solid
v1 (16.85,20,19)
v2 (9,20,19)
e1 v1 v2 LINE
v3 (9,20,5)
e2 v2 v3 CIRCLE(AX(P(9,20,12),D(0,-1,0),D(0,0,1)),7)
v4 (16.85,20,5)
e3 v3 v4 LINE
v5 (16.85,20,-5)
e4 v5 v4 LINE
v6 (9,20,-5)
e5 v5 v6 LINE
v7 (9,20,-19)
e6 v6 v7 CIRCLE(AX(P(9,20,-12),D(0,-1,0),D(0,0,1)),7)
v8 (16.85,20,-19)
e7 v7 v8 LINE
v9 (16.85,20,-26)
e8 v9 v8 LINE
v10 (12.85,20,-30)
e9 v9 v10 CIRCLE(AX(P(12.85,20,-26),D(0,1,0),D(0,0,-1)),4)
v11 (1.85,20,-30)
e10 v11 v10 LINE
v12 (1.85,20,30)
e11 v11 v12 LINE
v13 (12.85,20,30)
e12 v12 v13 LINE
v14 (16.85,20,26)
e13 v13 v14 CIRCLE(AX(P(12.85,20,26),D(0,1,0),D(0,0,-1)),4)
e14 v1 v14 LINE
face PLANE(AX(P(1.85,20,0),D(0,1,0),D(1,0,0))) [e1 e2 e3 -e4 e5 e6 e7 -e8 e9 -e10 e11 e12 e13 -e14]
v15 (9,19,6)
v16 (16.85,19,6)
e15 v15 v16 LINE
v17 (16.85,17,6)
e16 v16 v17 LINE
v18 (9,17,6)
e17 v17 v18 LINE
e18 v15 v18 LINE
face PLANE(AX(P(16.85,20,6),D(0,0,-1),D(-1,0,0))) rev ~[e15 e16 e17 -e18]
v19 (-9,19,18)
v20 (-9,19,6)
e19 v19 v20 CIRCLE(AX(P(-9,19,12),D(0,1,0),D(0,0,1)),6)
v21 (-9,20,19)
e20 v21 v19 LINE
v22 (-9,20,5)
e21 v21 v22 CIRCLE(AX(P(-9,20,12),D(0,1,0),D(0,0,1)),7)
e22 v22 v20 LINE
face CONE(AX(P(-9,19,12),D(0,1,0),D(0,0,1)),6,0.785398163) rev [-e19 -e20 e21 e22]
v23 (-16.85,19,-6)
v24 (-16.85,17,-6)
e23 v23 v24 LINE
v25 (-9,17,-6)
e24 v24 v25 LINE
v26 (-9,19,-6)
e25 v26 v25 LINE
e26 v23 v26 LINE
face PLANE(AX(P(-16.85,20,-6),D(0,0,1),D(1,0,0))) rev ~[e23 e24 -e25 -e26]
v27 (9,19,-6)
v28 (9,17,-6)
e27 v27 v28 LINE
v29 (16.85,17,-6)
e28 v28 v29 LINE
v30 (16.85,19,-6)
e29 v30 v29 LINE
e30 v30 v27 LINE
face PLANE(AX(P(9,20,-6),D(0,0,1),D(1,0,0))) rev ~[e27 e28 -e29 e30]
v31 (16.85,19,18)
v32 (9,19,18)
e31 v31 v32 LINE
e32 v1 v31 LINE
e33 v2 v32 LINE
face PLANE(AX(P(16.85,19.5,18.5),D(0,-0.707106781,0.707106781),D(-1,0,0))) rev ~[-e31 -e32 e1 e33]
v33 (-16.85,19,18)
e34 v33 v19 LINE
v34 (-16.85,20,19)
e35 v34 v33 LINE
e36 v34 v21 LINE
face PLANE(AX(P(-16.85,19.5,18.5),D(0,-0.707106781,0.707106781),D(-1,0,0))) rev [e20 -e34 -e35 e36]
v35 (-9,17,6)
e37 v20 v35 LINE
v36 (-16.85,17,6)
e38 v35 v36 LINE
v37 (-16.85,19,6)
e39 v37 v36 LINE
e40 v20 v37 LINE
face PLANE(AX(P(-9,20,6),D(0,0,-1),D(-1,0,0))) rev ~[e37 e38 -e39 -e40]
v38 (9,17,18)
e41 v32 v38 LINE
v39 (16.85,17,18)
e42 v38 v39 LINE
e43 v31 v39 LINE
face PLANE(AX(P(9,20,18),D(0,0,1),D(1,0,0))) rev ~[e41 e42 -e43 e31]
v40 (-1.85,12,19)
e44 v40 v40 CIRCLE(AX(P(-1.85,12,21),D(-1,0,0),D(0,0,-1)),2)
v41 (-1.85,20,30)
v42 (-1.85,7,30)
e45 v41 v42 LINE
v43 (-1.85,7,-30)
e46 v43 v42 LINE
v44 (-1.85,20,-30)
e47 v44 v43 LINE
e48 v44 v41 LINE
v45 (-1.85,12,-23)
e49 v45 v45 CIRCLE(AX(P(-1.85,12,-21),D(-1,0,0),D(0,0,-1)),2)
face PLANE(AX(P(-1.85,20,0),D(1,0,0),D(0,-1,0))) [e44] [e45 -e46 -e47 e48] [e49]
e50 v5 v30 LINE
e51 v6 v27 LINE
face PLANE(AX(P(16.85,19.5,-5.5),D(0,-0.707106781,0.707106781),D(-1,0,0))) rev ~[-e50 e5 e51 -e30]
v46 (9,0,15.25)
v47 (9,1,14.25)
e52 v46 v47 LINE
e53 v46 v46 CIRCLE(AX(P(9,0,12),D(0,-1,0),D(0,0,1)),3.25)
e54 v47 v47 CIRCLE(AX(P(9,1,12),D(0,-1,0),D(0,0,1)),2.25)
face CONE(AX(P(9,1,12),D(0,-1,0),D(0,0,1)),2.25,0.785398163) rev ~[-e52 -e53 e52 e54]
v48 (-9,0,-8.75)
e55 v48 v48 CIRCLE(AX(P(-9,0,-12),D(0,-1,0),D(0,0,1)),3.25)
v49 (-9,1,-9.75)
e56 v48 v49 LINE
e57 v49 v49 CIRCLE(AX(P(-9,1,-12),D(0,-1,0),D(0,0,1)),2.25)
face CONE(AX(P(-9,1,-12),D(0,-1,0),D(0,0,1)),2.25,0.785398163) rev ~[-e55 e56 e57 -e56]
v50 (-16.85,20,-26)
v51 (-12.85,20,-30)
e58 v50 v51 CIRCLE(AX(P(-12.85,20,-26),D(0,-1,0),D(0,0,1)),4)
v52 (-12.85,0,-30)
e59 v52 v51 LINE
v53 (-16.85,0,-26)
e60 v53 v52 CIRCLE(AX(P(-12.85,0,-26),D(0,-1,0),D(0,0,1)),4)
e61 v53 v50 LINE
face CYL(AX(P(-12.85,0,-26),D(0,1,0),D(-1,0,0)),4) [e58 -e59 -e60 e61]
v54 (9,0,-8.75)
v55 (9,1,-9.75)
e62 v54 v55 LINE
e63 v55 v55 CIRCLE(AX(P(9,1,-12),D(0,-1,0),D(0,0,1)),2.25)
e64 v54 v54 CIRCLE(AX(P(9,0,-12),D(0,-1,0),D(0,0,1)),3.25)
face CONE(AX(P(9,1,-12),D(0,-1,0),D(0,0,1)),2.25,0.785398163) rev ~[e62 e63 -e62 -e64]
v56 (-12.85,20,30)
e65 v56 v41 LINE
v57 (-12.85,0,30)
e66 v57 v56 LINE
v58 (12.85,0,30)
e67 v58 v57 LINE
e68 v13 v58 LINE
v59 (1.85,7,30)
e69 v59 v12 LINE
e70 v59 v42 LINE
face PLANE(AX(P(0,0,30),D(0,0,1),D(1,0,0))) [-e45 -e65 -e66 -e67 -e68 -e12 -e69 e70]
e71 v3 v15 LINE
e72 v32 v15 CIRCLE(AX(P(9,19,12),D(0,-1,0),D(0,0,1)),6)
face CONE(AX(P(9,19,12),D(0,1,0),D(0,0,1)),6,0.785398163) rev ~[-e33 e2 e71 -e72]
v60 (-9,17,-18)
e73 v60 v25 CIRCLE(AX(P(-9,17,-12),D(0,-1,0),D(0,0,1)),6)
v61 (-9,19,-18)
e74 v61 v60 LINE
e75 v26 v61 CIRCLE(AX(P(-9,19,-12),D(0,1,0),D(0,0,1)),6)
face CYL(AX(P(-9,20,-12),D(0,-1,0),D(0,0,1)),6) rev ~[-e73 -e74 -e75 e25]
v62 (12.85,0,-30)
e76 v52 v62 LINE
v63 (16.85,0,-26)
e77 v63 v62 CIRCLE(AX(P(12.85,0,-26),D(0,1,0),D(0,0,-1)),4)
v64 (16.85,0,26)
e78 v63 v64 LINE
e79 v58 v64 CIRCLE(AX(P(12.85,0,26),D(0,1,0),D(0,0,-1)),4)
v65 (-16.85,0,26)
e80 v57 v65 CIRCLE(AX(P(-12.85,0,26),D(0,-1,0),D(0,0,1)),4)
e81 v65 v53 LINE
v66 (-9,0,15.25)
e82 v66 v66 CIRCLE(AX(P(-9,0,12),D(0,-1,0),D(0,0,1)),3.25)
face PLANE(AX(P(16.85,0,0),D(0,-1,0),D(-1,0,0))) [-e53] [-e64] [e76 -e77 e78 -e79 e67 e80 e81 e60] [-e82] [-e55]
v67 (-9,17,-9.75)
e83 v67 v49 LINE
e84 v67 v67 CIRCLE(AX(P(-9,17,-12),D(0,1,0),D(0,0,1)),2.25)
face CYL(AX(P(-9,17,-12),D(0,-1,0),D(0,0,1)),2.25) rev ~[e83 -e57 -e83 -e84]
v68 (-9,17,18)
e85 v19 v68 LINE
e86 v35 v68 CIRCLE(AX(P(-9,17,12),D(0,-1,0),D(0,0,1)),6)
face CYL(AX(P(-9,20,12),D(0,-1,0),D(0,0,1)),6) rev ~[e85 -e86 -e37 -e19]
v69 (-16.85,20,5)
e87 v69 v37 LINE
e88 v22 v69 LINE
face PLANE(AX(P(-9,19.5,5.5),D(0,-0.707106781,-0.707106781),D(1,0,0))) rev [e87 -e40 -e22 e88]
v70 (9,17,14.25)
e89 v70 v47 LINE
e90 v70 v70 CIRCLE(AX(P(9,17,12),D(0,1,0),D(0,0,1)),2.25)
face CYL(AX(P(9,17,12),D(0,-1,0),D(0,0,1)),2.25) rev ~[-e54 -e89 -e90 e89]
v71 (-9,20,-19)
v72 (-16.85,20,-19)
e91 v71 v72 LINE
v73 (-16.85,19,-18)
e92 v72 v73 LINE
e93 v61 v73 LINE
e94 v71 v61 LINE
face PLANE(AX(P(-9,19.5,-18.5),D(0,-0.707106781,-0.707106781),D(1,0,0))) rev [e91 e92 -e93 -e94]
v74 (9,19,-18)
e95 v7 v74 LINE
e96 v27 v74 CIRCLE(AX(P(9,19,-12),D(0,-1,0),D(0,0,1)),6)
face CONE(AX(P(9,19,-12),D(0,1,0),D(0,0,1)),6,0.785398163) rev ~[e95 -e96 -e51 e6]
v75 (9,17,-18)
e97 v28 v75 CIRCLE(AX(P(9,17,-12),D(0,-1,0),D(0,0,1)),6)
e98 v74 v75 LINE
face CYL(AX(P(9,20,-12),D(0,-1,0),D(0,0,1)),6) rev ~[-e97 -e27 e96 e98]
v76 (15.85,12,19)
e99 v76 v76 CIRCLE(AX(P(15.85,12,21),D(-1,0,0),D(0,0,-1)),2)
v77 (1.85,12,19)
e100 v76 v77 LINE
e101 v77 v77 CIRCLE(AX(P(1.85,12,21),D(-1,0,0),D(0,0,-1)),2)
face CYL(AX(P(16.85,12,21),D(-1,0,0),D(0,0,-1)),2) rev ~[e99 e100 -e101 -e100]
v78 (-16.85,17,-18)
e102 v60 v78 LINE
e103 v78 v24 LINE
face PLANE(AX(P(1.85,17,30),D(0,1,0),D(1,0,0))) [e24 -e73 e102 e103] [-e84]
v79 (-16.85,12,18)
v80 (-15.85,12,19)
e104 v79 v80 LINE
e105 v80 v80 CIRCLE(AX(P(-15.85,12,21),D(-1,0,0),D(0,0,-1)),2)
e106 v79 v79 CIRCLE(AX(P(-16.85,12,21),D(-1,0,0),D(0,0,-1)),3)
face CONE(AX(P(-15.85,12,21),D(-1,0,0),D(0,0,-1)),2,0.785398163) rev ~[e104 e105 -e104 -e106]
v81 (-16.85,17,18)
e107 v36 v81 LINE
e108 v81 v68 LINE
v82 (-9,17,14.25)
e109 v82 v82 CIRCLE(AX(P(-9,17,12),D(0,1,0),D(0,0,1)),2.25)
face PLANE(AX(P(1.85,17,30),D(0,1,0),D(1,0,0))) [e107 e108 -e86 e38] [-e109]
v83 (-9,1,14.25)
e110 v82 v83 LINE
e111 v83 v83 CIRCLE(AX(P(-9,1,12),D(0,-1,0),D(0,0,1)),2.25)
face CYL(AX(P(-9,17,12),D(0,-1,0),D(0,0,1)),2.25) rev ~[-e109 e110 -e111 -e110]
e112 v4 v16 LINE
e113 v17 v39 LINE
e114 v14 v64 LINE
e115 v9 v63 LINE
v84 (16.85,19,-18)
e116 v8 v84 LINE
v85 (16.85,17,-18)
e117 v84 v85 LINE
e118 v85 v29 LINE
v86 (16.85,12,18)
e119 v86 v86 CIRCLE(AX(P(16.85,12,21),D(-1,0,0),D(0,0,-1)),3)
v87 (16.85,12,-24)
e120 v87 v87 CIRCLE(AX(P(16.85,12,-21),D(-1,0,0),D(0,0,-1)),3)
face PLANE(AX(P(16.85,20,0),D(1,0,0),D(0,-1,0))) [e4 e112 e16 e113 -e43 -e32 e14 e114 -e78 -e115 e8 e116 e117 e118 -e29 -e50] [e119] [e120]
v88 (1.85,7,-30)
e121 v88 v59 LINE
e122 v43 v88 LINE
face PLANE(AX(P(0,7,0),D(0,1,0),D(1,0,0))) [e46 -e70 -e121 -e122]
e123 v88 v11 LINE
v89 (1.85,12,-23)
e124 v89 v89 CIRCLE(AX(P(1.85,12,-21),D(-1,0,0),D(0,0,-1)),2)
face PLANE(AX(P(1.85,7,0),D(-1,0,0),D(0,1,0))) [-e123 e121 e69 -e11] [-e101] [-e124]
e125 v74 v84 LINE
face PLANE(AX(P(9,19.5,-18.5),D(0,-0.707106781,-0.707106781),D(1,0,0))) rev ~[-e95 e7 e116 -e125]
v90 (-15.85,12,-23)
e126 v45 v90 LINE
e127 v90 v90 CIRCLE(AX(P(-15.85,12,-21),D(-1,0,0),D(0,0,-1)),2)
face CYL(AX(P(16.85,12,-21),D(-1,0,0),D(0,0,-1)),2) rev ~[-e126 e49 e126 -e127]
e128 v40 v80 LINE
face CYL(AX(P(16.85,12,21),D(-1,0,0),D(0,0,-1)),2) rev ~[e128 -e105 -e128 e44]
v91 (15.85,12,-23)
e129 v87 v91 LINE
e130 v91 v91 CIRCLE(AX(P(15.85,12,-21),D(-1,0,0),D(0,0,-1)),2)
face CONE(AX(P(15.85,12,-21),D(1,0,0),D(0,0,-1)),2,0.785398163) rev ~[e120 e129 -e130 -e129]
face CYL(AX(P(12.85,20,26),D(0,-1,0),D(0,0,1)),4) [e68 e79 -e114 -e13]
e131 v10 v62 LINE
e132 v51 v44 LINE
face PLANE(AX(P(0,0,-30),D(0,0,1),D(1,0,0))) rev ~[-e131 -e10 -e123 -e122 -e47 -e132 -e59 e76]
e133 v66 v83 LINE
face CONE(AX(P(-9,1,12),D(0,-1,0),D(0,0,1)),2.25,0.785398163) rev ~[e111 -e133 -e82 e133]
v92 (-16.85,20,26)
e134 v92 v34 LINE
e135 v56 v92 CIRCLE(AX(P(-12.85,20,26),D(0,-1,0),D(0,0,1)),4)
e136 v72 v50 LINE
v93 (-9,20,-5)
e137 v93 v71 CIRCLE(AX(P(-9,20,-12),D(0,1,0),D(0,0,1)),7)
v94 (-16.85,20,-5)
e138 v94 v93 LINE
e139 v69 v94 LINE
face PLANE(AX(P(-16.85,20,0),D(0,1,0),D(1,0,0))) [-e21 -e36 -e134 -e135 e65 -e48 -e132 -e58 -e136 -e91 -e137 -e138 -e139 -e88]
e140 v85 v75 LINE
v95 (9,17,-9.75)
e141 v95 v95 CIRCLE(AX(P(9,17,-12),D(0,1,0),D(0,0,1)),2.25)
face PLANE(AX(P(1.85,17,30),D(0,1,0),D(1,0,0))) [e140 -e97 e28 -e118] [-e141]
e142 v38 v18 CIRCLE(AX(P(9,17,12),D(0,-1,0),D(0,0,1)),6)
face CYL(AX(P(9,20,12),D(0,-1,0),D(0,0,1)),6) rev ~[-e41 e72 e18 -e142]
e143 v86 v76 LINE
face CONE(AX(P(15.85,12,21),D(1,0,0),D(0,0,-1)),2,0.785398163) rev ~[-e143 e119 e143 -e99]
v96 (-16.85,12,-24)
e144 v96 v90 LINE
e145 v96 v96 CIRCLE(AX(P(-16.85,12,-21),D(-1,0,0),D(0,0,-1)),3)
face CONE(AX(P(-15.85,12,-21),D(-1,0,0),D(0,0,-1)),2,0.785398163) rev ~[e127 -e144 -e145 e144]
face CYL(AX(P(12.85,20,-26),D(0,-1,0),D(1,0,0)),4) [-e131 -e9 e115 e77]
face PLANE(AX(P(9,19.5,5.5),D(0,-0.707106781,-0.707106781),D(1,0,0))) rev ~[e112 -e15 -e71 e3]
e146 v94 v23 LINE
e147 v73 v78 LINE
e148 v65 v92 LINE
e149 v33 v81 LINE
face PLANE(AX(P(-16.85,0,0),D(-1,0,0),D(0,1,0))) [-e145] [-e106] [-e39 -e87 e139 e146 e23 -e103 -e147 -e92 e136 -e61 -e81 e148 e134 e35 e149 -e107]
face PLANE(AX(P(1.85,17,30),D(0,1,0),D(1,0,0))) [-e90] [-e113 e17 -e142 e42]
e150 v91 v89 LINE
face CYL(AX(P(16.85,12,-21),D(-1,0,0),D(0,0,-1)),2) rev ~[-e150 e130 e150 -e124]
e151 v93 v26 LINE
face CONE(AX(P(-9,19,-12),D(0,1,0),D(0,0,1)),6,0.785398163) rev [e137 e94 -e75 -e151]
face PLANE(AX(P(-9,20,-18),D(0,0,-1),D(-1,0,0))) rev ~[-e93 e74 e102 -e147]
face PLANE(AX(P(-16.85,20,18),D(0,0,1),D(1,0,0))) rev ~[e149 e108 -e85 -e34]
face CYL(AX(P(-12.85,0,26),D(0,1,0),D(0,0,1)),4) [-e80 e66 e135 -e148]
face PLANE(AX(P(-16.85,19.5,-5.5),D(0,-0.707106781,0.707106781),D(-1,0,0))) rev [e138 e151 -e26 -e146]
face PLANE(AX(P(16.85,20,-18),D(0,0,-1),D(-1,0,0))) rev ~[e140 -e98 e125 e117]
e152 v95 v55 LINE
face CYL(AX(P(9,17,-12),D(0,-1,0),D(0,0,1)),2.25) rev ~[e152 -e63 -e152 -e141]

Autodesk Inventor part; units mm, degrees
ref_plane "YZ Plane" through (0, 0, 0) normal (1, 0, 0) x (0, 1, 0)
ref_plane "XZ Plane" through (0, 0, 0) normal (0, 1, 0) x (-1, 0, 0)
ref_plane "XY Plane" through (0, 0, 0) normal (0, 0, 1) x (1, 0, 0)
sketch "Sketch1" plane through (0, 0, 0) normal (0, 0, 1) x (1, 0, 0)
  line L0 (16.85, 0) -> (-16.85, 0)
  line L1 (-16.85, 0) -> (-16.85, 20)
  line L2 (-16.85, 20) -> (-1.85, 20)
  line L3 (-1.85, 20) -> (-1.85, 7)
  line L4 (-1.85, 7) -> (1.85, 7)
  line L5 (1.85, 7) -> (1.85, 20)
  line L6 (1.85, 20) -> (16.85, 20)
  line L7 (16.85, 20) -> (16.85, 0)
  line L8 (-23.59, 0) -> (23.59, 0) projected
  line L9 (0, -4) -> (0, 24) projected
  point P0 (0, 0)
  point P1 (0, 7)
  point P2 (0, 0)
  dimension "d0" = 33.7
  dimension "d1" = 3.7
  dimension "d2" = 13
  dimension "d3" = 20
extrude "Extrusion1" add sketch "Sketch1" along normal mid plane 60
sketch "Sketch2" plane through (-16.85, 20, 30) normal (0, 1, 0) x (1, 0, 0)
  line L0 (0, 60) -> (0, 0) projected
  line L1 (15, 0) -> (0, 0) projected
  line L2 (15, 60) -> (15, 0) projected
  line L3 (0, 60) -> (15, 60) projected
  line L4 (18.7, 60) -> (18.7, 0) projected
  line L5 (33.7, 0) -> (18.7, 0) projected
  line L6 (33.7, 60) -> (33.7, 0) projected
  line L7 (18.7, 60) -> (33.7, 60) projected
  line L8 (25.85, 42) -> (7.85, 42) construction
  line L9 (7.85, 42) -> (7.85, 18) construction
  line L10 (7.85, 18) -> (25.85, 18) construction
  line L11 (25.85, 18) -> (25.85, 42) construction
  line L12 (25.85, 42) -> (7.85, 18) construction
  line L13 (7.85, 42) -> (25.85, 18) construction
  point P0 (16.85, 30)
  dimension "d6" = 18
  dimension "d7" = 24
hole "Hole1" at (-9, 20, 12) at (-9, 20, -12) at (9, 20, 12) at (9, 20, -12) direction (0, -1, 0) diameter 4.5 end through all counterbore diameter 12 counterbore depth 3
sketch "Sketch3" plane through (1.85, 20, 30) normal (0, 1, 0) x (1, 0, 0)
  circle A0 centre (-10.85, 18) radius 6 projected
  circle A1 centre (-10.85, 42) radius 6 projected
  line L0 (-18.7, 60) -> (-18.7, 0) projected
  line L1 (-3.7, 0) -> (-18.7, 0) projected
  line L2 (-3.7, 60) -> (-3.7, 0) projected
  line L3 (-18.7, 60) -> (-3.7, 60) projected
  circle A2 centre (7.15, 18) radius 6 projected
  circle A3 centre (7.15, 42) radius 6 projected
  line L4 (0, 60) -> (0, 0) projected
  line L5 (15, 0) -> (0, 0) projected
  line L6 (15, 60) -> (15, 0) projected
  line L7 (0, 60) -> (15, 60) projected
  line L8 (7.15, 12) -> (15, 12)
  line L9 (15, 12) -> (15, 24)
  line L10 (15, 24) -> (7.15, 24)
  line L11 (7.15, 24) -> (7.15, 12)
  line L12 (7.15, 36) -> (15, 36)
  line L13 (15, 36) -> (15, 48)
  line L14 (15, 48) -> (7.15, 48)
  line L15 (7.15, 48) -> (7.15, 36)
  line L16 (-18.7, 36) -> (-10.85, 36)
  line L17 (-10.85, 36) -> (-10.85, 48)
  line L18 (-10.85, 48) -> (-18.7, 48)
  line L19 (-18.7, 48) -> (-18.7, 36)
  line L20 (-18.7, 12) -> (-10.85, 12)
  line L21 (-10.85, 12) -> (-10.85, 24)
  line L22 (-10.85, 24) -> (-18.7, 24)
  line L23 (-18.7, 24) -> (-18.7, 12)
  circle A4 centre (7.15, 18) radius 6 projected
  circle A5 centre (7.15, 42) radius 6 projected
  point P0 (-1.85, 30)
extrude "Extrusion2" cut sketch "Sketch3" against normal blind 3 contours L21 A0 | A0 L20 L0 L22 | L0 L18 A1 L16 | A1 L17 | A2 L11 | A2 L10 L6 L8 | L12 A3 L14 L6 | L15 A3 picked at (-12.72, 18.7092) picked at (-12.72, 42.7092) picked at (8.397, 19.5637) picked at (8.7137, 43.247)
fillet "Fillet1" radius 4 4 edges at (-16.85, 10, 30) (16.85, 10, 30) (16.85, 10, -30) (-16.85, 10, -30)
chamfer "Chamfer1" distance 1 angle 45 12 edges at (3, 20, -12) (12.925, 20, -18) (12.925, 20, -6) (-12.925, 20, -18) (-3, 20, -12) (-12.925, 20, -6) (-12.925, 20, 6) (-3, 20, 12) (-12.925, 20, 18) (3, 20, 12) (12.925, 20, 6) (12.925, 20, 18)
chamfer "Chamfer2" distance 1 angle 45 4 edges at (-9, 0, 9.75) (9, 0, 9.75) (-9, 0, -14.25) (9, 0, -14.25)
sketch "Sketch4" plane through (16.85, 17, 18) normal (1, 0, 0) x (0, 0, -1)
  line L0 (-3, -5) -> (39, -5) construction
  line L1 (18, -21) -> (18, 7) projected
  line L2 (-1, 3) -> (-8, 3) projected
  point P0 (18, -17)
  point P1 (18, -5)
  dimension "d24" = 42
  dimension "d25" = 8
hole "Hole2" at (16.85, 12, 21) at (16.85, 12, -21) direction (-1, 0, 0) diameter 4 end through all
chamfer "Chamfer3" distance 1 angle 45 4 edges at (16.85, 12, 23) (16.85, 12, -19) (-16.85, 12, -19) (-16.85, 12, 23)
properties part number "sujetador plancha aluminio"
